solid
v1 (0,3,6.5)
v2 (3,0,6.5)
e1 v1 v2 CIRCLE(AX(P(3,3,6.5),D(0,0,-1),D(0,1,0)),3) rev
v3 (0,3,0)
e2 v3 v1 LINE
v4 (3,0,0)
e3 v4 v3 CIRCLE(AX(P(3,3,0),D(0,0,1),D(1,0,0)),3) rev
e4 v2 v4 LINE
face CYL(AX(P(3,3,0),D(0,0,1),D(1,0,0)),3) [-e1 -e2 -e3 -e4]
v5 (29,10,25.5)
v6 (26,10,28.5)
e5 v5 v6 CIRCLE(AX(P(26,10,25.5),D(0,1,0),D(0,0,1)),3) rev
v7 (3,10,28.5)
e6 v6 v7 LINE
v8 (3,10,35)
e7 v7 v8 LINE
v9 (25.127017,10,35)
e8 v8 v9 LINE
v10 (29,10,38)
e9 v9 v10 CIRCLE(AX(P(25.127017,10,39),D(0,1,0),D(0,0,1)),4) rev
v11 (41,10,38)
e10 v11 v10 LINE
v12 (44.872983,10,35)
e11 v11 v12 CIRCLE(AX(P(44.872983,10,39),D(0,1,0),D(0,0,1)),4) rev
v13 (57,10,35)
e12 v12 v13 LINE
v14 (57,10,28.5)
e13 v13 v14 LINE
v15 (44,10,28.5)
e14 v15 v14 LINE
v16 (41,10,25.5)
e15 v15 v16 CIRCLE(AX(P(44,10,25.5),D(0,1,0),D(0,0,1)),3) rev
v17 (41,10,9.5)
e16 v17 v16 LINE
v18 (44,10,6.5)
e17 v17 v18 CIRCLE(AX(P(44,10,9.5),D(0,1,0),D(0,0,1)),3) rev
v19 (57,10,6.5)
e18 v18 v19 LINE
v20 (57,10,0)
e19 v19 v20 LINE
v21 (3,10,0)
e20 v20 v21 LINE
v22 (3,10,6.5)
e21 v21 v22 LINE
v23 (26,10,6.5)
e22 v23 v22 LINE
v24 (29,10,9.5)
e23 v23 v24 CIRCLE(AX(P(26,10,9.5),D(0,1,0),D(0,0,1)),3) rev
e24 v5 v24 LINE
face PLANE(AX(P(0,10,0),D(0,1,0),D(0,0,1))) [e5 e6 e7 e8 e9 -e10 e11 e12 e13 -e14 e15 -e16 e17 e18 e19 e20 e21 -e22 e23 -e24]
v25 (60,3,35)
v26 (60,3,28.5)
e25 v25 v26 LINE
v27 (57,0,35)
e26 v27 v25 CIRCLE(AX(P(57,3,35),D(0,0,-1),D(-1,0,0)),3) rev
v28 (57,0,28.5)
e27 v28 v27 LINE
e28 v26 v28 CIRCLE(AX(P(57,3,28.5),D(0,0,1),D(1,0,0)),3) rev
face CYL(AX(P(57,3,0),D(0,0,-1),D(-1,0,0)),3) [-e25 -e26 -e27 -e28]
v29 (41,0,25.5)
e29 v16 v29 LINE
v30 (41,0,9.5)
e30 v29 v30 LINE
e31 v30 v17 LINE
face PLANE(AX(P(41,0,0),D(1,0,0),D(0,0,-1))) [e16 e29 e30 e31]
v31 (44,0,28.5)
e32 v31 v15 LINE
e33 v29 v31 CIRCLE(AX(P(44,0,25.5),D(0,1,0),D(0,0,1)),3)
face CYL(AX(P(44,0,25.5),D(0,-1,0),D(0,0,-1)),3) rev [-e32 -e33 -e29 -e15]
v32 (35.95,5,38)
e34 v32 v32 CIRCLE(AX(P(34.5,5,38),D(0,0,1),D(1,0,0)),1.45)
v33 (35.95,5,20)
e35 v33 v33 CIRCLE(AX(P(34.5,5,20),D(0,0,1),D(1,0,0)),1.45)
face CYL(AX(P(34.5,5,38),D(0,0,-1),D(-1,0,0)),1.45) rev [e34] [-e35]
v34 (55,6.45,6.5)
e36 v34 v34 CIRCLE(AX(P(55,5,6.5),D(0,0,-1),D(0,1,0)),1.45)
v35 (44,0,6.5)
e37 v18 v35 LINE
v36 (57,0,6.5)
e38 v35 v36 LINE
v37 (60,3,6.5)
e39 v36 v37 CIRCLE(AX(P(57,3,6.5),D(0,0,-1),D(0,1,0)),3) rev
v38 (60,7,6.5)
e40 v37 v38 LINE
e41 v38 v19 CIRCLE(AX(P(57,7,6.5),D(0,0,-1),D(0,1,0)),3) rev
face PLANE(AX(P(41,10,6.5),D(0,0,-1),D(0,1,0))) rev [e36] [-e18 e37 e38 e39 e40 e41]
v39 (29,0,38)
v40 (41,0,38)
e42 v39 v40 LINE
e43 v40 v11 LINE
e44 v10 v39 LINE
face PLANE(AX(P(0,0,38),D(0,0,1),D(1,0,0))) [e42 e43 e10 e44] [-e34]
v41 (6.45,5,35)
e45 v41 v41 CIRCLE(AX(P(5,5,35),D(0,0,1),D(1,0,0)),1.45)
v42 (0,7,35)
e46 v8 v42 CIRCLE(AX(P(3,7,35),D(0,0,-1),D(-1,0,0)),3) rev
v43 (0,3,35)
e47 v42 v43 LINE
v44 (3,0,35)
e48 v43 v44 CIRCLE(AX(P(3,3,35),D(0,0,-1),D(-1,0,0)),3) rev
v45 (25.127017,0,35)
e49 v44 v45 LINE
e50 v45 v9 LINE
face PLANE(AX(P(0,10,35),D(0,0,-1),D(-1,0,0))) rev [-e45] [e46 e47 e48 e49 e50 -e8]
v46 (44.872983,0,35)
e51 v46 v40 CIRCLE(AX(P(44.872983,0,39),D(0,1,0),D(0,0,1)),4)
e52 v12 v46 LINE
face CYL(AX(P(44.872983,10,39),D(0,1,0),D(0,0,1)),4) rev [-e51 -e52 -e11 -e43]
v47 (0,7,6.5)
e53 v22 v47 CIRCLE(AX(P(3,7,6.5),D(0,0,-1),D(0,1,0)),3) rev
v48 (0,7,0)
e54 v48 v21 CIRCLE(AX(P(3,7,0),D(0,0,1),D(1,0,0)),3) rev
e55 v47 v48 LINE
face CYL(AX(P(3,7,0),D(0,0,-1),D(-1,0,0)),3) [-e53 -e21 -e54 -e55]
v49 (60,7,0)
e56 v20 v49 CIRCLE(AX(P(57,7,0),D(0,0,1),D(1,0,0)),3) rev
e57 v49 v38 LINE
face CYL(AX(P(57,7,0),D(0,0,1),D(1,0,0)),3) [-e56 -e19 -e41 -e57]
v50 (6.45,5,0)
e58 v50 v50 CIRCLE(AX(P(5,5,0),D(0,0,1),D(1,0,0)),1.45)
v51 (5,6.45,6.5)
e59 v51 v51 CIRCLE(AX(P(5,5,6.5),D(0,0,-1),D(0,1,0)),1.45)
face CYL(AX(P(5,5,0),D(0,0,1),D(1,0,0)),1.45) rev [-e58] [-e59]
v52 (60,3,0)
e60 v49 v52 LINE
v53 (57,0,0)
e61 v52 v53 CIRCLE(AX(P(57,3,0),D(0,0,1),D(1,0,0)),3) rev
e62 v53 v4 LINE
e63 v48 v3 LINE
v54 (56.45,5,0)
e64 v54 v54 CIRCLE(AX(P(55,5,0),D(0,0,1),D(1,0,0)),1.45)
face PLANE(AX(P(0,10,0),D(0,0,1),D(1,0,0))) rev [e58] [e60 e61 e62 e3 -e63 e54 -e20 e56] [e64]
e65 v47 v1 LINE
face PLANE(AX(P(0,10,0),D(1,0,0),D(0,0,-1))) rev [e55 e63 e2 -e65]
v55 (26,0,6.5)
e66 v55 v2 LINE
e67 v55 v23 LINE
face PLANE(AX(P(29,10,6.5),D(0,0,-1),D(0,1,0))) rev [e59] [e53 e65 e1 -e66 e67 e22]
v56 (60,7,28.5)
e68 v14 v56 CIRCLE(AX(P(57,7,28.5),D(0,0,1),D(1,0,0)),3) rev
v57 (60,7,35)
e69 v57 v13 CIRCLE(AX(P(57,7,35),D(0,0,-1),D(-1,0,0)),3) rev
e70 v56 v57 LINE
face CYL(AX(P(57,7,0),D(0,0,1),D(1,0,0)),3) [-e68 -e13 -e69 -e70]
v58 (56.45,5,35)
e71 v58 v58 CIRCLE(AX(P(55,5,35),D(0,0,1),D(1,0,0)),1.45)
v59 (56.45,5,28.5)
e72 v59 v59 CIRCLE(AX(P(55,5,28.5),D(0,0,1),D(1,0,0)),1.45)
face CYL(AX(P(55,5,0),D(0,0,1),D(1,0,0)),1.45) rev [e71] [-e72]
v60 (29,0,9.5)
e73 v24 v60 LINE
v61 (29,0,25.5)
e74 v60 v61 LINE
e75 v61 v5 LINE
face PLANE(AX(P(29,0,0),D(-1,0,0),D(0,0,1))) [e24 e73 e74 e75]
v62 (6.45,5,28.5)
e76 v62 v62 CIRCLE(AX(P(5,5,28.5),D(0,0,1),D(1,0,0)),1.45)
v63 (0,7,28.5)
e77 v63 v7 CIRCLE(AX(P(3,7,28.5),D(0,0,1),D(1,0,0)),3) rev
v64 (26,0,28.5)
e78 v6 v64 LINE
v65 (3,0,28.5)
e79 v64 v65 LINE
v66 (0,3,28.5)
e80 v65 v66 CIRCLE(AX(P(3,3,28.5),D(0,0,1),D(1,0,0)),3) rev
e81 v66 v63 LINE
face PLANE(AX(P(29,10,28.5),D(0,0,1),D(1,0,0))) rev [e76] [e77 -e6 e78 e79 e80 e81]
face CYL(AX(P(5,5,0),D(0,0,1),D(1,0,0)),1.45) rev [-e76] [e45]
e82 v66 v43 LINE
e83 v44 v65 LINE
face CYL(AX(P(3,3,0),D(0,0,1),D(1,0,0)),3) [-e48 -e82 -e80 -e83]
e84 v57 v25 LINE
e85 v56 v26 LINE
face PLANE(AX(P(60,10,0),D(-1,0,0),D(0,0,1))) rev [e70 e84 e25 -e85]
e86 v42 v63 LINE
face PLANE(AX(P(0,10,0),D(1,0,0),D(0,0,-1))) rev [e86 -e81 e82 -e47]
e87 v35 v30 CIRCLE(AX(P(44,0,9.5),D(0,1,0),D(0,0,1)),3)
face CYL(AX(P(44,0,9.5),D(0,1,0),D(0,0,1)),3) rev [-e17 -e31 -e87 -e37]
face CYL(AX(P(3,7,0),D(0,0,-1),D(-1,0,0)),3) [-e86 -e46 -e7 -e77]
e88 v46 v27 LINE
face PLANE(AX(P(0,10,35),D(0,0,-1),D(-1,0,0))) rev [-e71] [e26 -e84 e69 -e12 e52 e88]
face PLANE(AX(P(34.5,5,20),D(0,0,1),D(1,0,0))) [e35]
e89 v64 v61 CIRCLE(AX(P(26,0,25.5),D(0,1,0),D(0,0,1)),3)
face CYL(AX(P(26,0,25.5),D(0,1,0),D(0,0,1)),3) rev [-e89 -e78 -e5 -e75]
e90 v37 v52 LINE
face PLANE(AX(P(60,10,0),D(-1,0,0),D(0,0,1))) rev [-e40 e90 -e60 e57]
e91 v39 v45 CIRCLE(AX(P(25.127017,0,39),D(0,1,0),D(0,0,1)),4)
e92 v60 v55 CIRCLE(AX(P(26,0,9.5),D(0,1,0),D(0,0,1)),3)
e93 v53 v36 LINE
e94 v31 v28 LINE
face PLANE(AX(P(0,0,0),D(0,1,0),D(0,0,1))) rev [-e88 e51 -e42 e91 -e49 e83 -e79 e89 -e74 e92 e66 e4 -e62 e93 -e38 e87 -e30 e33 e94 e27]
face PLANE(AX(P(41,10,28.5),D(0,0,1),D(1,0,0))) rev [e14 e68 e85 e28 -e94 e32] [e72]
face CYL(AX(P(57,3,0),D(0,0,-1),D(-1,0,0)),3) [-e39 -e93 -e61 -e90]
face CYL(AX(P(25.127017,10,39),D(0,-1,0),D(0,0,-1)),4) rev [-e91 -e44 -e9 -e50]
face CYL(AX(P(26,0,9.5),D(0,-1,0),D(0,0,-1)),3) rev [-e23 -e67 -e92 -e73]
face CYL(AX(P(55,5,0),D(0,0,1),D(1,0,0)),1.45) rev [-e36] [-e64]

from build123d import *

# Parameters (mm, degrees)
SKETCH1_W               = 60
SKETCH1_H               = 35
BOSS_EXTRUDE1_DEPTH     = 10
SKETCH2_W               = 22
SKETCH2_H               = 10
CUT_EXTRUDE1_DEPTH      = 19
SKETCH3_W               = 22
SKETCH3_H               = 10
CUT_EXTRUDE2_DEPTH      = 29
SKETCH5_R               = 1.45
CUT_EXTRUDE4_DEPTH      = 71.178344238
FILLET1_R               = 3
FILLET2_R               = 3
SKETCH7_W               = 12
SKETCH7_H               = 10
BOSS_EXTRUDE2_DEPTH     = 3
CUT_EXTRUDE5_DEPTH      = 3
CUT_EXTRUDE5_DEPTH_BACK = 15
SKETCH6_R               = 1.45
FILLET3_R               = 4


with BuildPart() as part:
    # Sketch1 → Boss-Extrude1 (new body)
    with BuildSketch(Plane(origin=(0, 0, 0), x_dir=(1, 0, 0), z_dir=(0, 1, 0))):
        with Locations((30, -17.5)):
            Rectangle(SKETCH1_W, SKETCH1_H)
    extrude(amount=BOSS_EXTRUDE1_DEPTH)

    # Sketch2 → Cut-Extrude1 (cut)
    with BuildSketch(Plane(origin=(60, 0, 0), x_dir=(0, 0, -1), z_dir=(1, 0, 0))):
        with Locations((-17.5, 5)):
            Rectangle(SKETCH2_W, SKETCH2_H)
    extrude(amount=-CUT_EXTRUDE1_DEPTH, mode=Mode.SUBTRACT)

    # Sketch3 → Cut-Extrude2 (cut)
    with BuildSketch(Plane.ZY):
        with Locations((17.5, 5)):
            Rectangle(SKETCH3_W, SKETCH3_H)
    extrude(amount=-CUT_EXTRUDE2_DEPTH, mode=Mode.SUBTRACT)

    # Sketch5 → Cut-Extrude4 (cut, through all)
    with BuildSketch(Plane.XY.offset(35)):
        with Locations((5, 5)):
            Circle(SKETCH5_R)
        with Locations((55, 5)):
            Circle(SKETCH5_R)
    extrude(amount=-CUT_EXTRUDE4_DEPTH, mode=Mode.SUBTRACT)

    # Fillet1
    fillet1_edges = [part.edges().sort_by_distance(p)[0] for p in [
        (60, 10, 31.75),
        (60, 0, 3.25),
        (60, 10, 3.25),
        (0, 0, 31.75),
        (0, 10, 31.75),
        (0, 10, 3.25),
        (60, 0, 31.75),
        (0, 0, 3.25),
    ]]
    fillet(fillet1_edges, radius=FILLET1_R)

    # Fillet2
    fillet2_edges = [part.edges().sort_by_distance(p)[0] for p in [
        (41, 5, 28.5),
        (41, 5, 6.5),
        (29, 5, 6.5),
        (29, 5, 28.5),
    ]]
    fillet(fillet2_edges, radius=FILLET2_R)

    # Sketch7 → Boss-Extrude2 (add)
    with BuildSketch(Plane.XY.offset(35)):
        with Locations((35, 5)):
            Rectangle(SKETCH7_W, SKETCH7_H)
    extrude(amount=BOSS_EXTRUDE2_DEPTH)

    # Sketch6 → Cut-Extrude5 (cut, two sides: drawn at the far end of the back side and taken through both)
    with BuildSketch(Plane.XY.offset(35).offset(-CUT_EXTRUDE5_DEPTH_BACK)):
        with Locations((34.5, 5)):
            Circle(SKETCH6_R)
    extrude(amount=CUT_EXTRUDE5_DEPTH + CUT_EXTRUDE5_DEPTH_BACK, mode=Mode.SUBTRACT)

    # Fillet3
    # the kernel refuses this fillet: 4 mm, written as the material it adds along each edge
    with BuildSketch(Plane(origin=(41, 10, 35), x_dir=(0, 0, 1), z_dir=(0, -1, 0))) as fillet3_piece_1:
        with BuildLine():
            CenterArc((4, -3.872983346), FILLET3_R, 104.477512186, 75.522487814)
            Line((0, -3.872983346), (-0.08, -3.872983346))
            Line((-0.08, -3.872983346), (-0.08, 0))
            Line((-0.08, 0), (0, 0.08))
            ThreePointArc((0, 0.08), (1.5, 0.08), (2.98, 0.077459667))
            Line((2.98, 0.077459667), (3, 0))
        make_face()
    extrude(amount=10)
    with BuildSketch(Plane(origin=(29, 0, 35), x_dir=(-1, 0, 0), z_dir=(0, 1, 0))) as fillet3_piece_2:
        with BuildLine():
            CenterArc((3.872983346, 4), FILLET3_R, 194.477512186, 75.522487814)
            Line((0, 3), (-0.077459667, 2.98))
            ThreePointArc((-0.077459667, 2.98), (-0.08, 1.5), (-0.08, 0))
            Line((-0.08, 0), (0, -0.08))
            Line((0, -0.08), (3.872983346, -0.08))
            Line((3.872983346, -0.08), (3.872983346, 0))
        make_face()
    extrude(amount=10)


solid = part.part
